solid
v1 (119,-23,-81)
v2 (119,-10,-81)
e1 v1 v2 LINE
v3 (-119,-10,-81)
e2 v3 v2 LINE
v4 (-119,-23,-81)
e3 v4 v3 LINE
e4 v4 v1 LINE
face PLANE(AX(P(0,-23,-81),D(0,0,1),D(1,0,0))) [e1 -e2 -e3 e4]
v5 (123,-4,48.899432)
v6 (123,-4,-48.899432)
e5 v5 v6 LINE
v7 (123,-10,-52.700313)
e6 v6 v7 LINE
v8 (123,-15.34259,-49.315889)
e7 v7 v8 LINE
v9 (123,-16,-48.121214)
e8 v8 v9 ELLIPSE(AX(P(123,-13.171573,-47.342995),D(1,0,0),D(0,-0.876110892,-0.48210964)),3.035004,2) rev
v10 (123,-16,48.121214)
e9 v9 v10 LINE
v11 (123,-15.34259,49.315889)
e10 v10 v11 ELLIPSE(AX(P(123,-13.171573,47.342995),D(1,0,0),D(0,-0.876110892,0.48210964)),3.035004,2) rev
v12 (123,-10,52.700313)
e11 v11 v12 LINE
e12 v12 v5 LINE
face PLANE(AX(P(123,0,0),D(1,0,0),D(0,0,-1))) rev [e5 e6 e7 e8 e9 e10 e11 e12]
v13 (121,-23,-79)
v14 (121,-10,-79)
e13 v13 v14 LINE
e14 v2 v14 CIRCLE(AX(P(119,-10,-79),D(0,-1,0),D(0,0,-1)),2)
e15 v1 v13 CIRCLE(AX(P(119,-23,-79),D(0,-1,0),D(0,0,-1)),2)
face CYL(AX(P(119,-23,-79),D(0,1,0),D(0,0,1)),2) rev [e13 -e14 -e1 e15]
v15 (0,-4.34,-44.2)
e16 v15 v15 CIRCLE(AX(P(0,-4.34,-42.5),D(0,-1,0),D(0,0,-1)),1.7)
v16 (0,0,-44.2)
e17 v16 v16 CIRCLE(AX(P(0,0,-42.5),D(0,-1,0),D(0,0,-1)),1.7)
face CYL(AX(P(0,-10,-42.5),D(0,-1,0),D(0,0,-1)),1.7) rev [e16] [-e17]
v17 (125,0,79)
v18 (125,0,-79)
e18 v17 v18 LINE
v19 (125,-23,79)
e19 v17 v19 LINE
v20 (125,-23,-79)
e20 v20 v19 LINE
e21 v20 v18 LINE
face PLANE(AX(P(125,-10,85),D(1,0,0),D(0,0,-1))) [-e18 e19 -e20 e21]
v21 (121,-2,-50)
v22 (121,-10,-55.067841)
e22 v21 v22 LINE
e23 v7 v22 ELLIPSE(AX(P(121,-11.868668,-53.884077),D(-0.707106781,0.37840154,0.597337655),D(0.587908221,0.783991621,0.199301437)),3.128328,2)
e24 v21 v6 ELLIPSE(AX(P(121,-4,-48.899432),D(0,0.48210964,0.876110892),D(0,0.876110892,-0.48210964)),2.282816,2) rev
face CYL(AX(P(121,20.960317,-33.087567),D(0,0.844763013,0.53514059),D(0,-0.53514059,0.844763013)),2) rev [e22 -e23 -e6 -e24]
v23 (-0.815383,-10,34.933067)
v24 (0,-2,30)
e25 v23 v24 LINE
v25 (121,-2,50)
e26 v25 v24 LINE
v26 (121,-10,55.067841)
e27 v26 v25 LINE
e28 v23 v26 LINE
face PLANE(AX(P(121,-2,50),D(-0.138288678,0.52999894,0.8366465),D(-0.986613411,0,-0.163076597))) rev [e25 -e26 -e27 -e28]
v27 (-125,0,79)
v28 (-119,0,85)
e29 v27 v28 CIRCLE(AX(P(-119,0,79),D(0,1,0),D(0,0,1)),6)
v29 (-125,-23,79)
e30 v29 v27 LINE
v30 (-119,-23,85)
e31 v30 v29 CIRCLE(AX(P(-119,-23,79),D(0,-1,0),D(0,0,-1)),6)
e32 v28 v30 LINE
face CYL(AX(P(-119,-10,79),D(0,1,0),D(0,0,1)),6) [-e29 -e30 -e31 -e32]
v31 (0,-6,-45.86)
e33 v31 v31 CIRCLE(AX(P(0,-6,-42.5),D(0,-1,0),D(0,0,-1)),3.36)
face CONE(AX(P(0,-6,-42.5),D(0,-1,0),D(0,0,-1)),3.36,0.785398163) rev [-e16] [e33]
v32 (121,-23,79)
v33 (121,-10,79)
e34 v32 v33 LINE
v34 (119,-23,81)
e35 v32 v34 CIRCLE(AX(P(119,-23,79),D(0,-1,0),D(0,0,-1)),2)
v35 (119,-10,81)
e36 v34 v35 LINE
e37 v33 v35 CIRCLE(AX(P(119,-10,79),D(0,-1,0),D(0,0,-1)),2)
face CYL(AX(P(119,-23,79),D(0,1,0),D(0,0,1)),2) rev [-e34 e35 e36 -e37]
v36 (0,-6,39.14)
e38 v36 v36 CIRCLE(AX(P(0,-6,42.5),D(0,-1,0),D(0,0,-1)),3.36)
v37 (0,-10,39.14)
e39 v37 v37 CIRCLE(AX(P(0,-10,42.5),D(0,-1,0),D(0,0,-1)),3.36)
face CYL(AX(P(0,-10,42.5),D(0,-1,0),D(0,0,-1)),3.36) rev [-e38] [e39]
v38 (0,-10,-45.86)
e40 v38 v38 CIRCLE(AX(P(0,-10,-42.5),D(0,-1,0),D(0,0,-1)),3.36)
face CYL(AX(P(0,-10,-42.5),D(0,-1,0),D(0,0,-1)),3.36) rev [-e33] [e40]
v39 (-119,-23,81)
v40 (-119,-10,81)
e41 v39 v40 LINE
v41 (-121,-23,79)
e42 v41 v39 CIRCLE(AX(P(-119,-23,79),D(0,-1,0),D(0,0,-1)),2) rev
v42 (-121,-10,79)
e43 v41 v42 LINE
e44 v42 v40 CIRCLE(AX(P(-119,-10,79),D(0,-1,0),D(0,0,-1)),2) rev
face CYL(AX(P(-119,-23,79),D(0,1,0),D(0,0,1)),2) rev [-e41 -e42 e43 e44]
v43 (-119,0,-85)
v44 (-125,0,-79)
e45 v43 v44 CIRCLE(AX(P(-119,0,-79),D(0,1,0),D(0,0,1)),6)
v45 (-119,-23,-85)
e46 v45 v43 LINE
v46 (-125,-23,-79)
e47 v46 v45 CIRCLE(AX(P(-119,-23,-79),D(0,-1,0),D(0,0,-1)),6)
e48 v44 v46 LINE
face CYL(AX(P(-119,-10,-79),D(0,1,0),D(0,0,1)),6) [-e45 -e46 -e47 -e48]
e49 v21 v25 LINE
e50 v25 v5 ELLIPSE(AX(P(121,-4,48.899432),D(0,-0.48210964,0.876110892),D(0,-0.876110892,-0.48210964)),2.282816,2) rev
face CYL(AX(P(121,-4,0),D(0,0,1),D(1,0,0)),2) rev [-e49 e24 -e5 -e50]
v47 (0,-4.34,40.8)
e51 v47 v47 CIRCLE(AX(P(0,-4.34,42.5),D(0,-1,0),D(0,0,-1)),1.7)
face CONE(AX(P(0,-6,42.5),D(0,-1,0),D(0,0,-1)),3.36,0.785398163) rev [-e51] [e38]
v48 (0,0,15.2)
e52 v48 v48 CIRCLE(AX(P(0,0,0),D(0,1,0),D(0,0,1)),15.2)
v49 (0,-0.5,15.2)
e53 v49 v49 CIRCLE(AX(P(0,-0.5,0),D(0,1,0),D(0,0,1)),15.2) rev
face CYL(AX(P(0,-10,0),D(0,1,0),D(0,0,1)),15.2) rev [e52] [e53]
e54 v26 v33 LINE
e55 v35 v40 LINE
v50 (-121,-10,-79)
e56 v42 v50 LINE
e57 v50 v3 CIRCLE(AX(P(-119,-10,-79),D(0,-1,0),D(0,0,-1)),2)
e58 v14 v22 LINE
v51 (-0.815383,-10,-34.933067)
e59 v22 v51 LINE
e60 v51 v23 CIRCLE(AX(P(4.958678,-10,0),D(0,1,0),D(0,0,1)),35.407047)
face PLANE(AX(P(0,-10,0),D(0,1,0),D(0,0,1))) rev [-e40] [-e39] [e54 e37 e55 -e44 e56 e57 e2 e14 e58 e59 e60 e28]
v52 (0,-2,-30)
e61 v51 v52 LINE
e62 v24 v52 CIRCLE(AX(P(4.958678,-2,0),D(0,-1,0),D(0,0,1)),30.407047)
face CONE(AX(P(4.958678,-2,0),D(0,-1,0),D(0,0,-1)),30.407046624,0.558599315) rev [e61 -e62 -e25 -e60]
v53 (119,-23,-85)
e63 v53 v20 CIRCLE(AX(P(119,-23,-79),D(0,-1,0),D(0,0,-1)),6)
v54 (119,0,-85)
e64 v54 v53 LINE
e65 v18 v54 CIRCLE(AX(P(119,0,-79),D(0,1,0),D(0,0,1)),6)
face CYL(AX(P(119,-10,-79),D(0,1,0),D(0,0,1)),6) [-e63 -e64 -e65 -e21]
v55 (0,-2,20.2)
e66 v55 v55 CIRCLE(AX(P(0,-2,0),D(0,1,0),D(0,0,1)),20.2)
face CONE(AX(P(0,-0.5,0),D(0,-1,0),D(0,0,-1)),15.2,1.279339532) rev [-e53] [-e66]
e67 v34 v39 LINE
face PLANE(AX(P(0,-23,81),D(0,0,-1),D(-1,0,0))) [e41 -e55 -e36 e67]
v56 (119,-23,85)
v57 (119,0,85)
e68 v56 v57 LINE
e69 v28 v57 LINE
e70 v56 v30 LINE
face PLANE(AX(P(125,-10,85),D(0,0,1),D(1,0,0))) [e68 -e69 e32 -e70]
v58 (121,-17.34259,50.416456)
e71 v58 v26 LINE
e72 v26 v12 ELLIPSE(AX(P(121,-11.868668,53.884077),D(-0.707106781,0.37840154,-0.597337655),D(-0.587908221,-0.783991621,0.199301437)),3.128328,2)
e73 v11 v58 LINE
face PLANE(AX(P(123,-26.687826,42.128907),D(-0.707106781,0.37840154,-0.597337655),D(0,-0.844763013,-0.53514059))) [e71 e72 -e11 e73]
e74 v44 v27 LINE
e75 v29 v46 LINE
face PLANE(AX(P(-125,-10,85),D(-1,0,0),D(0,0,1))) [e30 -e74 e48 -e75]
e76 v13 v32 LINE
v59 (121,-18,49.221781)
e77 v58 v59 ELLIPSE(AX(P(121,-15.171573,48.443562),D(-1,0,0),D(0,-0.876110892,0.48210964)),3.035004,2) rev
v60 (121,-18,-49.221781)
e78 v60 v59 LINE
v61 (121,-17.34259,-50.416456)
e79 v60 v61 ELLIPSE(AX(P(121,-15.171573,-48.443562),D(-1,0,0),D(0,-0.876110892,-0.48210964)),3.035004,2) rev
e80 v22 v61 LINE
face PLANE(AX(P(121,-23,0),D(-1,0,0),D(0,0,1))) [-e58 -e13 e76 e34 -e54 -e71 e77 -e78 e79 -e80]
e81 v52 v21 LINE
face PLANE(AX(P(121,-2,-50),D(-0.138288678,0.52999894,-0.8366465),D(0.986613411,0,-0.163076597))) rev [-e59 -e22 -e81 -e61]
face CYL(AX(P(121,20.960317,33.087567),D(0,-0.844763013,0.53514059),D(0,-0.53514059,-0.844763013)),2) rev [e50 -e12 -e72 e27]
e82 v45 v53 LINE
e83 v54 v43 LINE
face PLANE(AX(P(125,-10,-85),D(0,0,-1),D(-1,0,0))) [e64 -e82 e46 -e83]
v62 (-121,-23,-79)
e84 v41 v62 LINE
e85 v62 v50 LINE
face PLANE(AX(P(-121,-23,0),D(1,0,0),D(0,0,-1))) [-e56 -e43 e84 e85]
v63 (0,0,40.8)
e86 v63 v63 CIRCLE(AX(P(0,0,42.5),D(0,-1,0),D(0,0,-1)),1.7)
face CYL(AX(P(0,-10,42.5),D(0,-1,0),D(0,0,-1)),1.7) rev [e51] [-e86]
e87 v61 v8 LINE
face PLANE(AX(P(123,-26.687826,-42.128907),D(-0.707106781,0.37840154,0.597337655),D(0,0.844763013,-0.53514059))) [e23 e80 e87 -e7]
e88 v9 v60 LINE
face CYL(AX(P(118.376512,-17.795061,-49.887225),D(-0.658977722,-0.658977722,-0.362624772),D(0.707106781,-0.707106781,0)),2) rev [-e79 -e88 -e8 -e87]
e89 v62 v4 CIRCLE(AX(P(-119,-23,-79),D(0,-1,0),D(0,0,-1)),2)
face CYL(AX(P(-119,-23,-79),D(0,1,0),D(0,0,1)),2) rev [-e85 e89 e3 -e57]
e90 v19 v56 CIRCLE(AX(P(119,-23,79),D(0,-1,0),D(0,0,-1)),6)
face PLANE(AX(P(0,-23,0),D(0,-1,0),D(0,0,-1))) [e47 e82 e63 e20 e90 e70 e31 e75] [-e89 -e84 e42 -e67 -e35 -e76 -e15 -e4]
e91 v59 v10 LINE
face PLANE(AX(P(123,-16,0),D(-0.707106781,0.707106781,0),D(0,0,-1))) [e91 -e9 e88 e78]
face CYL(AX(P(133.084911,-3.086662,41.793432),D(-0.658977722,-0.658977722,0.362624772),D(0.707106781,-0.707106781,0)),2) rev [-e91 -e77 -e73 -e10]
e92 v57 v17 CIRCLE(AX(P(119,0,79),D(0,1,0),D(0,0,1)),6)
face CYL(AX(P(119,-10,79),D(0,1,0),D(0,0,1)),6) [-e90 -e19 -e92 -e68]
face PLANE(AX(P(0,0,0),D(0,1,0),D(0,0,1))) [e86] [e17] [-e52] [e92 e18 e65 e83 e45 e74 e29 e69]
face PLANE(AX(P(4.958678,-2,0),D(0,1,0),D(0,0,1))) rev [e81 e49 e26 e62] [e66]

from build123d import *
from OCP.BRepFilletAPI import BRepFilletAPI_MakeChamfer

# Parameters (mm, degrees)
SKETCH1_W                                    = 250
SKETCH1_H                                    = 170
SKETCH1_R                                    = 15.2
BOSS_EXTRUDE1_DEPTH                          = 10
FILLET1_R                                    = 6
BOSS_EXTRUDE2_START                          = 13
BOSS_EXTRUDE2_DEPTH                          = 13
CUT_EXTRUDE1_DEPTH                           = 8
CHAMFER1_SIZE                                = 5
CHAMFER1_SIZE2                               = 1.5
CSK_FOR_M3_HEX_SOCKET_COUNTERSUNK_CA_2_COUNT = 2
CSK_FOR_M3_HEX_SOCKET_COUNTERSUNK_CA_2_PITCH = 85
CHAMFER2_SIZE                                = 8
CHAMFER2_SIZE_2                              = 5
CUT_EXTRUDE2_DEPTH                           = 2
CHAMFER3_SIZE                                = 2
FILLET2_R                                    = 2


# Some blends are built 0.0001 mm under size
with BuildPart() as part:
    # Sketch1 → Boss-Extrude1 (new body)
    with BuildSketch(Plane(origin=(0, 0, 0), x_dir=(1, 0, 0), z_dir=(0, 1, 0))):
        Rectangle(SKETCH1_W, SKETCH1_H)
        with Locations(Location((0, 0, 0), (0, 0, 270))):
            Circle(SKETCH1_R, mode=Mode.SUBTRACT)
    extrude(amount=-BOSS_EXTRUDE1_DEPTH)

    # Fillet1
    fillet1_edges = [part.edges().sort_by_distance(p)[0] for p in [
        (-125, -5, -85),
        (125, -5, -85),
        (125, -5, 85),
        (-125, -5, 85),
    ]]
    fillet(fillet1_edges, radius=FILLET1_R)

    # Sketch3 → Boss-Extrude2 (add)
    with BuildSketch(Plane.XZ.offset(10).offset(BOSS_EXTRUDE2_START)):
        with BuildLine():
            Line((-125, 79), (-125, -79))
            ThreePointArc((-125, -79), (-123.242640687, -83.242640687), (-119, -85))
            Line((-119, -85), (119, -85))
            ThreePointArc((119, -85), (123.242640687, -83.242640687), (125, -79))
            Line((125, -79), (125, 79))
            ThreePointArc((125, 79), (123.242640687, 83.242640687), (119, 85))
            Line((119, 85), (-119, 85))
            ThreePointArc((-119, 85), (-123.242640687, 83.242640687), (-125, 79))
        make_face()
        with BuildLine():
            Line((-121, 79), (-121, -79))
            ThreePointArc((-121, -79), (-120.414213562, -80.414213562), (-119, -81))
            Line((-119, -81), (119, -81))
            ThreePointArc((119, -81), (120.414213562, -80.414213562), (121, -79))
            Line((121, -79), (121, 79))
            ThreePointArc((121, 79), (120.414213562, 80.414213562), (119, 81))
            Line((119, 81), (-119, 81))
            ThreePointArc((-119, 81), (-120.414213562, 80.414213562), (-121, 79))
        make_face(mode=Mode.SUBTRACT)
    extrude(amount=-BOSS_EXTRUDE2_DEPTH)

    # Sketch4 → Cut-Extrude1 (cut)
    with BuildSketch(Plane.XZ.offset(10)):
        with BuildLine():
            Line((121, -50), (121, 50))
            Line((121, 50), (0, 30))
            ThreePointArc((0, 30), (-25.448368938, 0), (0, -30))
            Line((0, -30), (121, -50))
        make_face()
    extrude(amount=-CUT_EXTRUDE1_DEPTH, mode=Mode.SUBTRACT)

    # Chamfer1
    chamfer1_edges = [part.edges().sort_by_distance(p)[0] for p in [
        (0, -2, -15.2),
    ]]
    chamfer1_side = [part.faces().sort_by_distance(p)[0] for p in [
        (61.561292917, -2, 0),
    ]]
    chamfer(chamfer1_edges, length=CHAMFER1_SIZE, length2=CHAMFER1_SIZE2, reference=chamfer1_side[0])

    # Sketch7 → CSK for M3 Hex Socket Countersunk Cap Screw1 (revolve, cut)
    with BuildSketch(Plane(origin=(0, -10, -42.5), x_dir=(0, 0, -1), z_dir=(1, 0, 0))):
        Polygon((0, 0), (0, 10), (1.7, 10), (1.7, 5.66), (3.36, 4), (3.36, 0), align=None)
    csk_for_m3_hex_socket_countersunk_cap_sc = revolve(axis=Axis((0, -16.35, -42.5), (0, 1, 0)), mode=Mode.SUBTRACT)

    # CSK for M3 Hex Socket Countersunk Ca 2: CSK for M3 Hex Socket Countersunk Cap Screw1 ×2
    with Locations(*[(0, 0, i * CSK_FOR_M3_HEX_SOCKET_COUNTERSUNK_CA_2_PITCH) for i in range(1, CSK_FOR_M3_HEX_SOCKET_COUNTERSUNK_CA_2_COUNT)]):
        add(csk_for_m3_hex_socket_countersunk_cap_sc, mode=Mode.SUBTRACT)

    # Chamfer2
    chamfer2_edges_1 = [part.edges().sort_by_distance(p)[0] for p in [
        (60.5, -10, -40),
    ]]
    chamfer2_side_1 = [part.faces().sort_by_distance(p)[0] for p in [
        (60.5, -9.9, -40),
    ]]
    chamfer2_edges_2 = [part.edges().sort_by_distance(p)[0] for p in [
        (-25.448368938, -10, 0),
    ]]
    chamfer2_side_2 = [part.faces().sort_by_distance(p)[0] for p in [
        (-25.448368938, -9.9, 0),
    ]]
    chamfer2_edges_3 = [part.edges().sort_by_distance(p)[0] for p in [
        (60.5, -10, 40),
    ]]
    chamfer2_side_3 = [part.faces().sort_by_distance(p)[0] for p in [
        (60.5, -9.9, 40),
    ]]
    chamfer2 = BRepFilletAPI_MakeChamfer(part.part.solid().wrapped)
    for e in chamfer2_edges_1:
        chamfer2.Add(CHAMFER2_SIZE - 0.0001, CHAMFER2_SIZE_2 - 0.0001, e.wrapped, chamfer2_side_1[0].wrapped)
    for e in chamfer2_edges_2:
        chamfer2.Add(CHAMFER2_SIZE - 0.0001, CHAMFER2_SIZE_2 - 0.0001, e.wrapped, chamfer2_side_2[0].wrapped)
    for e in chamfer2_edges_3:
        chamfer2.Add(CHAMFER2_SIZE - 0.0001, CHAMFER2_SIZE_2 - 0.0001, e.wrapped, chamfer2_side_3[0].wrapped)
    add(Compound.cast(chamfer2.Shape()), mode=Mode.REPLACE)  # a hair under: the kernel refuses the full size

    # Sketch8 → Cut-Extrude2 (cut)
    with BuildSketch(Plane.ZY.offset(-121)):
        Polygon((55.067841104, -10), (50, -2), (-50, -2), (-55.067841104, -10), (-50, -18), (50, -18), align=None)
    extrude(amount=-CUT_EXTRUDE2_DEPTH, mode=Mode.SUBTRACT)

    # Chamfer3
    chamfer3_edges = [part.edges().sort_by_distance(p)[0] for p in [
        (123, -14, -52.533920552),
        (123, -18, 0),
        (123, -14, 52.533920552),
    ]]
    chamfer(chamfer3_edges, length=CHAMFER3_SIZE - 0.0001)  # a hair under: the kernel refuses the full size

    # Fillet2
    # the kernel refuses this fillet: 2 mm, written as the material it adds along each edge
    with BuildSketch(Plane(origin=(119.805291771, -19.194808229, -50.657483625), x_dir=(-0.25641443496762006, 0.6500466420129046, -0.715325800421027), z_dir=(0.6589777215811099, 0.6589777215811111, 0.36262477151945494))) as fillet2_piece_1_section:
        with BuildLine():
            CenterArc((FILLET2_R * 0.362624771519, FILLET2_R), FILLET2_R, 230.136202028, 39.863797972)
            Line((-FILLET2_R * 0.278340002895, FILLET2_R * 0.232429704874), (0, 0))
            Line((0, 0), (FILLET2_R * 0.362624771519, 0))
        make_face()
    fillet2_piece_1 = extrude(amount=6.661099933, mode=Mode.PRIVATE)
    fillet2_piece_1 = split(fillet2_piece_1, bisect_by=Plane(origin=(121, -18.0000375, -50.000020636), z_dir=(1, 0, 0)), keep=Keep.TOP, mode=Mode.PRIVATE)
    add(fillet2_piece_1)
    with BuildSketch(Plane(origin=(124.194808229, -14.805291771, 48.242003783), x_dir=(-0.2564144349676279, -0.25641443496763033, -0.9319352311617277), z_dir=(-0.6589777215811099, -0.658977721581111, 0.3626247715194551))) as fillet2_piece_2_section:
        with BuildLine():
            CenterArc((FILLET2_R * 0.362624771519, -FILLET2_R), FILLET2_R, 90, 39.863797972)
            Line((-FILLET2_R * 0.278340002895, -FILLET2_R * 0.232429704874), (0, 0))
            Line((0, 0), (FILLET2_R * 0.362624771519, 0))
        make_face()
    fillet2_piece_2 = extrude(amount=6.661099933, mode=Mode.PRIVATE)
    fillet2_piece_2 = split(fillet2_piece_2, bisect_by=Plane(origin=(121, -16.865837899, 49.375888958), z_dir=(1, 0, 0)), keep=Keep.TOP, mode=Mode.PRIVATE)
    add(fillet2_piece_2)
    with BuildSketch(Plane(origin=(123, -12.35524068, 56.559839295), x_dir=(0, -0.5351405902517741, -0.8447630133149668), z_dir=(0, 0.844763013314967, -0.5351405902517741))) as fillet2_piece_3_section:
        with BuildLine():
            CenterArc((FILLET2_R, FILLET2_R), FILLET2_R, 180, 90)
            Line((0, FILLET2_R), (0, 0))
            Line((0, 0), (FILLET2_R, 0))
        make_face()
    fillet2_piece_3 = extrude(amount=17.258160593, mode=Mode.PRIVATE)
    fillet2_piece_3 = split(fillet2_piece_3, bisect_by=Plane(origin=(122.545498185, 0, 51.673056741), z_dir=(0, -1, 0)), keep=Keep.TOP, mode=Mode.PRIVATE)
    add(fillet2_piece_3)
    with BuildSketch(Plane(origin=(123, 2.223815067, -47.324297049), x_dir=(-1, 0, 0), z_dir=(0, -0.8447630133149663, -0.5351405902517751))) as fillet2_piece_4_section:
        with BuildLine():
            CenterArc((FILLET2_R, -FILLET2_R), FILLET2_R, 90, 90)
            Line((0, -FILLET2_R), (0, 0))
            Line((0, 0), (FILLET2_R, 0))
        make_face()
    fillet2_piece_4 = extrude(amount=17.258160593, mode=Mode.PRIVATE)
    fillet2_piece_4 = split(fillet2_piece_4, bisect_by=Plane(origin=(122.545498185, 0, -51.67305674), z_dir=(0, -1, 0)), keep=Keep.TOP, mode=Mode.PRIVATE)
    add(fillet2_piece_4)
    with BuildSketch(Plane(origin=(123, -2, 55), x_dir=(0, -1, 0), z_dir=(0, 0, -1))) as fillet2_piece_5:
        with BuildLine():
            CenterArc((FILLET2_R, FILLET2_R), FILLET2_R, 180, 90)
            Line((0, FILLET2_R), (0, 0))
            Line((0, 0), (FILLET2_R, 0))
        make_face()
    extrude(amount=110)


solid = part.part
